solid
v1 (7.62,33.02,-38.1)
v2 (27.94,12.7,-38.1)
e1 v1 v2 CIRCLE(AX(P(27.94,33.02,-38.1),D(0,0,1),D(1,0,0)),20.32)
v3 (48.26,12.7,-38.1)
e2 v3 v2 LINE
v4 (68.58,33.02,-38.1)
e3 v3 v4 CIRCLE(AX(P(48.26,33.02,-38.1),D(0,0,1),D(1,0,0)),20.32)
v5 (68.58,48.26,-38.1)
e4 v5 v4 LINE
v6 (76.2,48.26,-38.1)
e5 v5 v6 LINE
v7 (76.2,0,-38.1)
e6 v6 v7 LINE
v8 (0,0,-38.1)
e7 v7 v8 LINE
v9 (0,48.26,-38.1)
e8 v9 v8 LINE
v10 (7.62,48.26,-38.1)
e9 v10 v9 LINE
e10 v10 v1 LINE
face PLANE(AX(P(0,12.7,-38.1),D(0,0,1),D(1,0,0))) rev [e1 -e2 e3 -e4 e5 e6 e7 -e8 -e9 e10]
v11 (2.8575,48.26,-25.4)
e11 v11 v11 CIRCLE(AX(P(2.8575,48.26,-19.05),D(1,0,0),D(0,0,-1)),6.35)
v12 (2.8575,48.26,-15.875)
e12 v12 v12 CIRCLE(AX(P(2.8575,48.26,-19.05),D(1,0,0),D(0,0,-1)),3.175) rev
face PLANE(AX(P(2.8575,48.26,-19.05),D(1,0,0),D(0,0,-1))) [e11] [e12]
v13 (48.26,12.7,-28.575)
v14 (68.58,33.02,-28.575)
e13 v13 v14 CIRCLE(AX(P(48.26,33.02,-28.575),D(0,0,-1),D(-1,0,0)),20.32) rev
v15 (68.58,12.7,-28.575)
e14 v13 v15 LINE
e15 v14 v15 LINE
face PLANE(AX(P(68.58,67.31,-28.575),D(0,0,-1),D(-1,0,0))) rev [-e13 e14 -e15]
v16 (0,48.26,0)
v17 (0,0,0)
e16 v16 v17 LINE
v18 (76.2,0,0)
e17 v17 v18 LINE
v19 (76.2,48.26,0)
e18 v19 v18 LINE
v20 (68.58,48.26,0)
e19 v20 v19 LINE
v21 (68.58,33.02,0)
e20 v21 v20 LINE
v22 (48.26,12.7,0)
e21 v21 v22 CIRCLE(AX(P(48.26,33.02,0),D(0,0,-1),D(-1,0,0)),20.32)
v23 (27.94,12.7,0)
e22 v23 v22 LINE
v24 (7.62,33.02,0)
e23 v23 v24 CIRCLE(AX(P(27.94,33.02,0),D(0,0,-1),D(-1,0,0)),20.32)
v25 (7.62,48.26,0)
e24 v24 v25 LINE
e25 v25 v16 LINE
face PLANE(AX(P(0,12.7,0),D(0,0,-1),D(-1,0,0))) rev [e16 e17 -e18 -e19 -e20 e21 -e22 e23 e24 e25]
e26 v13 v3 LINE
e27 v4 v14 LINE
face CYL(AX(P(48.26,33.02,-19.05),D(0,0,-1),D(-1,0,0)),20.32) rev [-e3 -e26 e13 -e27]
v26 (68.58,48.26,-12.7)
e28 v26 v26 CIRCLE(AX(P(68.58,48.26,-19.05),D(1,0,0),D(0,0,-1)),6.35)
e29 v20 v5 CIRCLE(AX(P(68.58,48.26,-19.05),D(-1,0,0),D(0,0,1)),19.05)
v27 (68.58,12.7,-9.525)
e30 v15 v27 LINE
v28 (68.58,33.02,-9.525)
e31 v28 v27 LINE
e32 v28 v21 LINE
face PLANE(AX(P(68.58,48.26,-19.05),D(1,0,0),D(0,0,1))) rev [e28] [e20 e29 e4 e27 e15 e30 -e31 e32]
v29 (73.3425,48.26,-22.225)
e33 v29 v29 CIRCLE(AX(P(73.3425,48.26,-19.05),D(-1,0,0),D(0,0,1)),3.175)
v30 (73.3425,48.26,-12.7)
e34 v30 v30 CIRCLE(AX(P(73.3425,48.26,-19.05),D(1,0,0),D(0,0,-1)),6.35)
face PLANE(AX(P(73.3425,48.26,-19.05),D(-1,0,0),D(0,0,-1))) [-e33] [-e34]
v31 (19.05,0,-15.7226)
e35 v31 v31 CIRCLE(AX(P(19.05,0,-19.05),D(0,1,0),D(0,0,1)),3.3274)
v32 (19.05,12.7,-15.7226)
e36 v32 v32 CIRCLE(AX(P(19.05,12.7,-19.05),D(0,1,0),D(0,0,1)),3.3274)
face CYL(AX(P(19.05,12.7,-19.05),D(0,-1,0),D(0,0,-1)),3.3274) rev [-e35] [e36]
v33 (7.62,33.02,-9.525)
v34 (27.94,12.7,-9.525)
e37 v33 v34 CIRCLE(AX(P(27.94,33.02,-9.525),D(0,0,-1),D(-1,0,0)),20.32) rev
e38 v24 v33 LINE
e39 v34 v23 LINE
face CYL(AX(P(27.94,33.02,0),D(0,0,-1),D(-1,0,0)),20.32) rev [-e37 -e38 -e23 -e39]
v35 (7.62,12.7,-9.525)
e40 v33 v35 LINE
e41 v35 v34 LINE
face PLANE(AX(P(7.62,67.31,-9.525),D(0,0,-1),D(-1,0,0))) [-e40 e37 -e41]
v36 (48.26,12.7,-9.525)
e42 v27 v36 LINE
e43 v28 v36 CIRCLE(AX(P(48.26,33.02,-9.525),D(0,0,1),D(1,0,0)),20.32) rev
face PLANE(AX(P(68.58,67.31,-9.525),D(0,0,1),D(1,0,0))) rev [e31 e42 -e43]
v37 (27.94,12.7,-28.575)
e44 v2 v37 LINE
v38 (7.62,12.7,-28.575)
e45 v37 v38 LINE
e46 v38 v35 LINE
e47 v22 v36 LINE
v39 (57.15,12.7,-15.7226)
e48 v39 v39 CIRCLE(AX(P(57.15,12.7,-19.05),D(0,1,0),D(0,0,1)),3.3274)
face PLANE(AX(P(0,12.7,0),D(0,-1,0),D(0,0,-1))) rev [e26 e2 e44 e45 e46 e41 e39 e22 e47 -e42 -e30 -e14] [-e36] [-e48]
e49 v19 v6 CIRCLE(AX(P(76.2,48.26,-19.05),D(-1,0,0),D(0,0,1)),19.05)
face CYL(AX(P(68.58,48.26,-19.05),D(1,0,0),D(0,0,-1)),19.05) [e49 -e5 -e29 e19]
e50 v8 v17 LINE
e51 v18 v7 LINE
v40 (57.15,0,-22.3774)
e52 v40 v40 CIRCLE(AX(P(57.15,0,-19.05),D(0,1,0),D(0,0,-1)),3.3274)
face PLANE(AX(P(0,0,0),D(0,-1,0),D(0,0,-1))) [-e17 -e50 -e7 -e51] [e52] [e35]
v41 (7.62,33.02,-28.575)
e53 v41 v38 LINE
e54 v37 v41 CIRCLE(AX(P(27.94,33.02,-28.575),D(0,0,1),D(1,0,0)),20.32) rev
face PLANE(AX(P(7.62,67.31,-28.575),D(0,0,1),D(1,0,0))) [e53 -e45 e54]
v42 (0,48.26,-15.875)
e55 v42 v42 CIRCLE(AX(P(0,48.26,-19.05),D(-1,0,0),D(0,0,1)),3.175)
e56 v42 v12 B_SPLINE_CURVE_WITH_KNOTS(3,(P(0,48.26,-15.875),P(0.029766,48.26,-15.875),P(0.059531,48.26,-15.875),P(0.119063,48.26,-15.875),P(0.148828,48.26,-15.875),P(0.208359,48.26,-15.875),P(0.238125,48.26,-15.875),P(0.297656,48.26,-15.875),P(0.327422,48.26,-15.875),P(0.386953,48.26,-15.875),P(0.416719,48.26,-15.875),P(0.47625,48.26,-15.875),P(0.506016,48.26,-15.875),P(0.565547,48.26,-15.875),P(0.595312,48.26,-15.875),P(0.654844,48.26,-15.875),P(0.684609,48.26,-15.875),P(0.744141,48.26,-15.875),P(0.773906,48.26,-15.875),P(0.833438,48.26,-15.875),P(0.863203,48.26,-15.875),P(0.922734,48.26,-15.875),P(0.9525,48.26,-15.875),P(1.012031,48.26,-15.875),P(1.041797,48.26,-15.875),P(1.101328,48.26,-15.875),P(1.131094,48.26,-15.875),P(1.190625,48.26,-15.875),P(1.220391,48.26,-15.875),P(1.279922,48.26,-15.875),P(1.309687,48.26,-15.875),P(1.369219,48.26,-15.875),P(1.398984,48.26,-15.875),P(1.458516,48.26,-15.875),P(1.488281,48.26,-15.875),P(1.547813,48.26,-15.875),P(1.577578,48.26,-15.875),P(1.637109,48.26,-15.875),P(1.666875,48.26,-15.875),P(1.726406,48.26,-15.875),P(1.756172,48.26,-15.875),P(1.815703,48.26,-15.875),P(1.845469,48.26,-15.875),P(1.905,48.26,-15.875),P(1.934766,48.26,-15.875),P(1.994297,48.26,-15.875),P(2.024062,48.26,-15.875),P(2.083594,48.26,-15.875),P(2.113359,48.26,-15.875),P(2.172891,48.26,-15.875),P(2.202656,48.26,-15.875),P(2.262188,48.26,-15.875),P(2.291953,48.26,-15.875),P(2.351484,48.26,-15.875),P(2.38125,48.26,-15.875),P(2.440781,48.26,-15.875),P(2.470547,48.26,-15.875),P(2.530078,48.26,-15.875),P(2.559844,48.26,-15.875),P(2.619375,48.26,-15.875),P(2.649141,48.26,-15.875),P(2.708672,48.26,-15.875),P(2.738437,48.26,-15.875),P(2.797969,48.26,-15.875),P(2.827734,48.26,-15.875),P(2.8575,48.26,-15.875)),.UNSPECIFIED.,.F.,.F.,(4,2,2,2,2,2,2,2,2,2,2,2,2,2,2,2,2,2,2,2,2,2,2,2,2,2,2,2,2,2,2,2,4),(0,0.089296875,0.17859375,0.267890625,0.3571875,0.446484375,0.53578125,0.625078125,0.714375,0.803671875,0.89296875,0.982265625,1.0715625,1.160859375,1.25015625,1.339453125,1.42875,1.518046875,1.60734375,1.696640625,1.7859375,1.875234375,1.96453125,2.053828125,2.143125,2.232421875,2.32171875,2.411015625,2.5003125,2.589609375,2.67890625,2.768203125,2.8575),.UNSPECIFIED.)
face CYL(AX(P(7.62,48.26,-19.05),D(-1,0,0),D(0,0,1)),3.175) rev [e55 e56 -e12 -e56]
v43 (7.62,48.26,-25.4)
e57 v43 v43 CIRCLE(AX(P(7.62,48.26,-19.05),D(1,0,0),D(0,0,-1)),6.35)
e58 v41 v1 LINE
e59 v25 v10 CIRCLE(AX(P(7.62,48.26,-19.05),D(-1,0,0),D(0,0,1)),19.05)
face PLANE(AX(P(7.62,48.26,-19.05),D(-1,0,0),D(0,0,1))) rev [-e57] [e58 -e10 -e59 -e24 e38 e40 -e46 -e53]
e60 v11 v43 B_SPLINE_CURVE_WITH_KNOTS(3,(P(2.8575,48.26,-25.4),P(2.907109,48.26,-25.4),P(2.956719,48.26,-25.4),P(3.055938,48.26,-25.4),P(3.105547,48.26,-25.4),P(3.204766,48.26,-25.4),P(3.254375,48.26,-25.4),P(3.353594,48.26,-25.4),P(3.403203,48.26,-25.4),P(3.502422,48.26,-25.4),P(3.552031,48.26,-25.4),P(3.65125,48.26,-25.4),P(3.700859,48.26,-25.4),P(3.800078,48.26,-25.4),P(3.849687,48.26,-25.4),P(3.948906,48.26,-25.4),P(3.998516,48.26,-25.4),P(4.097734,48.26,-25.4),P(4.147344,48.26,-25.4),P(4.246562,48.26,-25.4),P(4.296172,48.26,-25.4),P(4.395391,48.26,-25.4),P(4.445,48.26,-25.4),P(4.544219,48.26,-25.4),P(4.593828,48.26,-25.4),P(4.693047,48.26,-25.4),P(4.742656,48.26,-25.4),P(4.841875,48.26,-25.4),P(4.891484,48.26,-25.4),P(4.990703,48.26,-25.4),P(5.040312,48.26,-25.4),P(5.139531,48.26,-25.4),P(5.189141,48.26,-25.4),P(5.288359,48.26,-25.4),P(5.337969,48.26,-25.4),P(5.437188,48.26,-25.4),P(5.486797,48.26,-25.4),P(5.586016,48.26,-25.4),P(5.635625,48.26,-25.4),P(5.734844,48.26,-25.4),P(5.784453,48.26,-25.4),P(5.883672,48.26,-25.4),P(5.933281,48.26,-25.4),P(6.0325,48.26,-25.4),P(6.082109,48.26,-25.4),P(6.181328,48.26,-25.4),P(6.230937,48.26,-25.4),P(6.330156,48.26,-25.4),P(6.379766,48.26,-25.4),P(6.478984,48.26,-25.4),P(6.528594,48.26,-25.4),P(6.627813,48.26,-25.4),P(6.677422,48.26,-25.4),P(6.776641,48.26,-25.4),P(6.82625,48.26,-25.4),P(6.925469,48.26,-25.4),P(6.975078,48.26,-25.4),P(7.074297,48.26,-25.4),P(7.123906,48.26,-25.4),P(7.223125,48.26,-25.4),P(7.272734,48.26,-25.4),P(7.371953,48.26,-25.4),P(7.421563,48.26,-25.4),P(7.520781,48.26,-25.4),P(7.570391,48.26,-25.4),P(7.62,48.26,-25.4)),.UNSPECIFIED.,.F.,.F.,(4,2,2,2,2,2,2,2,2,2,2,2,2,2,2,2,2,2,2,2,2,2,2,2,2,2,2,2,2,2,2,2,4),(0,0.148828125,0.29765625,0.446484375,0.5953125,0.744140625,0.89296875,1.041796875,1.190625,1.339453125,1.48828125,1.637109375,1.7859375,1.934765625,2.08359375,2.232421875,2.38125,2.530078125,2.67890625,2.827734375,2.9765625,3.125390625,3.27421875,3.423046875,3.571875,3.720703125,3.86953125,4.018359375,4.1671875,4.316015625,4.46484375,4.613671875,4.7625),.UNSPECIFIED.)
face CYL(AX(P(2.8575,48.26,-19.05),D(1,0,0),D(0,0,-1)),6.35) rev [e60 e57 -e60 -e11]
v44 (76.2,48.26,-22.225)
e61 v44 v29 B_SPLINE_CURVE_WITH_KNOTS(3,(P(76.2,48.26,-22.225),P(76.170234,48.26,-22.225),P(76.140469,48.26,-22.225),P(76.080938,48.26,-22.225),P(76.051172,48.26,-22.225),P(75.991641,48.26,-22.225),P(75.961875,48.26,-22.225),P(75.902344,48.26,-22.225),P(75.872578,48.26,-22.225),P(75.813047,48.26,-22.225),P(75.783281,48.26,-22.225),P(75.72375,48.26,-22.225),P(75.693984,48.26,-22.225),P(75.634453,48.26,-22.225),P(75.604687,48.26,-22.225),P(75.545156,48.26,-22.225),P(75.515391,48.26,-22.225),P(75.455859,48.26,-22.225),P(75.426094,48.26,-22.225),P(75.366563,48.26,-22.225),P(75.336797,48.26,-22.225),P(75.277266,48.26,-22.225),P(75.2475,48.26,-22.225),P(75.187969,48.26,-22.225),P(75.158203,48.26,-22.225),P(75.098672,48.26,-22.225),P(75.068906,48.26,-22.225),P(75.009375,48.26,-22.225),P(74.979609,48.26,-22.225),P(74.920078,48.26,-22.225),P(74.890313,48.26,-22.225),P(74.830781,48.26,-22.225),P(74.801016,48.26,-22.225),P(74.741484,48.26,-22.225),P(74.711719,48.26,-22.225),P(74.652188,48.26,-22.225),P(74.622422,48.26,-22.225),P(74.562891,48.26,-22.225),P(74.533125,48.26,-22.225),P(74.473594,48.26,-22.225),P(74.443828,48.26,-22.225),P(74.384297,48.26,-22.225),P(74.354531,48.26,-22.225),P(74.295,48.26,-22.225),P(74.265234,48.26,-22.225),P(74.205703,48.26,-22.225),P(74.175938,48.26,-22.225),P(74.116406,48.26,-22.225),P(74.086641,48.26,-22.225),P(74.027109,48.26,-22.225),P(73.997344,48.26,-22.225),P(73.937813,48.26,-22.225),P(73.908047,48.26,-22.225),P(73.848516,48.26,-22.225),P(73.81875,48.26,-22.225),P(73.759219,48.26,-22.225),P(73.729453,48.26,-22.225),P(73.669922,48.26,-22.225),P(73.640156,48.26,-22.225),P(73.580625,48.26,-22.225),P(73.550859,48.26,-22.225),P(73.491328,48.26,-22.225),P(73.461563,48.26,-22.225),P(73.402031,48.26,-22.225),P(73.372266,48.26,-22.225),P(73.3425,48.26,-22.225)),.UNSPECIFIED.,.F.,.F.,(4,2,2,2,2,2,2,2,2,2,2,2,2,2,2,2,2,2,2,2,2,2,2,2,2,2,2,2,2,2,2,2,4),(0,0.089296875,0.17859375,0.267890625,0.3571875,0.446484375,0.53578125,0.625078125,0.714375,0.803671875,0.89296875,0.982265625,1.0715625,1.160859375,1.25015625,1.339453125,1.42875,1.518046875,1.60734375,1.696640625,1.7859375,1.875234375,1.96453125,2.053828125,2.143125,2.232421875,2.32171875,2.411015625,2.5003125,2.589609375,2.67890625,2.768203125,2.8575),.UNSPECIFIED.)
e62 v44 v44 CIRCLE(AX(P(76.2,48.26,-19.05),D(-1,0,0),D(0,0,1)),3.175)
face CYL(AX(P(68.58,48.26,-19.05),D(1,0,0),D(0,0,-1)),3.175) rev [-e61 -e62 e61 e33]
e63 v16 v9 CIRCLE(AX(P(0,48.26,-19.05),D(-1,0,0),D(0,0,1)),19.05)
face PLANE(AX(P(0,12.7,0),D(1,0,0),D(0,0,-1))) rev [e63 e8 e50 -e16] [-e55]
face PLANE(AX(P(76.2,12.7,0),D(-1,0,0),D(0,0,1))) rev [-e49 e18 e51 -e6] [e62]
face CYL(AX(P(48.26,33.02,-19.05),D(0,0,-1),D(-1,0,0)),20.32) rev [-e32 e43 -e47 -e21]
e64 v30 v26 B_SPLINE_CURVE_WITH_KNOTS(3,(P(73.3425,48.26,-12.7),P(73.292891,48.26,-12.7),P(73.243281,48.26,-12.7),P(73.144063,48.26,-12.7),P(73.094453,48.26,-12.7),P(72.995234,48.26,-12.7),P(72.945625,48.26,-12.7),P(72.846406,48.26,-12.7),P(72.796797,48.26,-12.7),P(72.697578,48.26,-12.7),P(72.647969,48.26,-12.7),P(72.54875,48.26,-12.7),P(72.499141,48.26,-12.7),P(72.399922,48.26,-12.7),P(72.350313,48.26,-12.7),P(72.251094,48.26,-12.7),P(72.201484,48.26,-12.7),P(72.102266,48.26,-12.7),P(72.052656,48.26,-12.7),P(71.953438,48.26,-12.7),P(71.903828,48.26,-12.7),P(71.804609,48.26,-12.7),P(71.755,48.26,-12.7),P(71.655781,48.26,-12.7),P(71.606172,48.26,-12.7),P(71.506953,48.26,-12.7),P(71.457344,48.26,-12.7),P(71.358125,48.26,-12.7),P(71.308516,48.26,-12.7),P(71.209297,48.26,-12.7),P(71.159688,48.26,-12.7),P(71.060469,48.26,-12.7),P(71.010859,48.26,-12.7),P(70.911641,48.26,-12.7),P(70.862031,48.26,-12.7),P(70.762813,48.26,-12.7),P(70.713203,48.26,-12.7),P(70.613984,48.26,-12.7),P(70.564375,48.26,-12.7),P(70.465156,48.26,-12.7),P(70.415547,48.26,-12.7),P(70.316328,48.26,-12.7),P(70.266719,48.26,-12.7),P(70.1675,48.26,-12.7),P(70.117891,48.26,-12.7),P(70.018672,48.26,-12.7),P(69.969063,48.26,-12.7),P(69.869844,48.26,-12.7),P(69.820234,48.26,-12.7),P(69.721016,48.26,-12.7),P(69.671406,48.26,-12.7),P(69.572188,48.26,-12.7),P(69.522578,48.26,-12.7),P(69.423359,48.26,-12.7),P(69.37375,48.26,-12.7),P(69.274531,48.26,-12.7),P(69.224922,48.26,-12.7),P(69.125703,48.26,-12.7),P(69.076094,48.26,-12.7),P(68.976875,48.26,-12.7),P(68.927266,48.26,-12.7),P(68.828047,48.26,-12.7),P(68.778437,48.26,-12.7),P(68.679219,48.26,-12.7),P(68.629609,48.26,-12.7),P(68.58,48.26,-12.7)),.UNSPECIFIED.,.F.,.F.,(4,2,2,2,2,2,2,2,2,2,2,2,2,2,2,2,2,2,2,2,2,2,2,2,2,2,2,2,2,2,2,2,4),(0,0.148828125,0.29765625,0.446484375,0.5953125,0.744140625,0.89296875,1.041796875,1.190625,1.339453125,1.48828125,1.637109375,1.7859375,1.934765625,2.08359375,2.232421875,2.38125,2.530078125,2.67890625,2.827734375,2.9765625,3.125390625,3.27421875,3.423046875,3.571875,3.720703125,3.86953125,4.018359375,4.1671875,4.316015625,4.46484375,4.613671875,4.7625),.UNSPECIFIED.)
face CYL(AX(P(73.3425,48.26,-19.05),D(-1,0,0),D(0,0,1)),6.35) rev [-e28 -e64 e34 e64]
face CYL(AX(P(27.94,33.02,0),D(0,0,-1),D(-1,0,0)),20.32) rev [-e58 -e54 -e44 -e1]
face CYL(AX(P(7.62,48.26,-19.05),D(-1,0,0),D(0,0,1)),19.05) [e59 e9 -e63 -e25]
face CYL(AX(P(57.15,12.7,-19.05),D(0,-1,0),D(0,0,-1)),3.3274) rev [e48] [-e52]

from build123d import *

# Parameters (mm, degrees)
SKETCH1_W           = 76.2
SKETCH1_H           = 38.1
SKETCH1_R           = 3.3274
BOSS_EXTRUDE1_DEPTH = 12.7
SKETCH5_R           = 3.175
BOSS_EXTRUDE3_DEPTH = 7.62
FILLET3_START       = -15.722599236
FILLET3_DEPTH       = 15.722599236
FILLET3_START_2     = -38.1
FILLET3_2_DEPTH     = 15.722595954
FILLET3_START_3     = -22.377404046
FILLET3_3_DEPTH     = 6.65480481
FILLET3_START_4     = 12.7
FILLET3_4_OUTLINE_R = 3.3274
FILLET3_4_DEPTH     = 20.32
SKETCH11_W          = 25.4
SKETCH11_H          = 19.05
CUT_EXTRUDE2_DEPTH  = 102.194377846
SKETCH13_R          = 6.35
CUT_EXTRUDE3_DEPTH  = 4.7625


with BuildPart() as part:
    # Sketch1 → Boss-Extrude1 (new body)
    with BuildSketch(Plane(origin=(0, 0, 0), x_dir=(1, 0, 0), z_dir=(0, 1, 0))):
        with Locations((38.1, 19.05)):
            Rectangle(SKETCH1_W, SKETCH1_H)
        with Locations(Location((19.05, 19.05, 0), (0, 0, 270))):
            Circle(SKETCH1_R, mode=Mode.SUBTRACT)
        with Locations(Location((57.15, 19.05, 0), (0, 0, 90))):
            Circle(SKETCH1_R, mode=Mode.SUBTRACT)
    extrude(amount=BOSS_EXTRUDE1_DEPTH)

    # Sketch5 → Boss-Extrude3 (add)
    with BuildSketch(Plane.ZY):
        with BuildLine():
            Line((-38.1, 12.7), (0, 12.7))
            Line((0, 12.7), (0, 48.26))
            ThreePointArc((0, 48.26), (-19.05, 67.31), (-38.1, 48.26))
            Line((-38.1, 48.26), (-38.1, 12.7))
        make_face()
        with Locations((-19.05, 48.26)):
            Circle(SKETCH5_R, mode=Mode.SUBTRACT)
    boss_extrude3 = extrude(amount=-BOSS_EXTRUDE3_DEPTH)

    # Fillet3: read off the stored shape, not the designer's step
    # Fillet3 outline → Fillet3 (add)
    with BuildSketch(Plane.XY.offset(FILLET3_START)):
        with BuildLine():
            Line((7.62, 12.7), (27.94, 12.7))
            ThreePointArc((27.94, 12.7), (13.571590206, 18.651590206), (7.62, 33.02))
            Line((7.62, 33.02), (7.62, 12.7))
        make_face()
    fillet3 = extrude(amount=FILLET3_DEPTH)

    # Fillet3 2 outline → Fillet3 2 (add)
    with BuildSketch(Plane.XY.offset(FILLET3_START_2)):
        with BuildLine():
            Line((7.62, 12.7), (27.94, 12.7))
            ThreePointArc((27.94, 12.7), (13.571590206, 18.651590206), (7.62, 33.02))
            Line((7.62, 33.02), (7.62, 12.7))
        make_face()
    fillet3_2 = extrude(amount=FILLET3_2_DEPTH)

    # Fillet3 3 outline → Fillet3 3 (add)
    with BuildSketch(Plane.XY.offset(FILLET3_START_3)):
        with BuildLine():
            Line((7.62, 12.7), (27.94, 12.7))
            ThreePointArc((27.94, 12.7), (13.571590206, 18.651590206), (7.62, 33.02))
            Line((7.62, 33.02), (7.62, 12.7))
        make_face()
    fillet3_3 = extrude(amount=FILLET3_3_DEPTH)

    # Fillet3 4 outline → Fillet3 4 (cut)
    with BuildSketch(Plane(origin=(0, 0, 0), x_dir=(1, 0, 0), z_dir=(0, 1, 0)).offset(FILLET3_START_4)):
        with Locations((19.05, 19.05)):
            Circle(FILLET3_4_OUTLINE_R)
    fillet3_4 = extrude(amount=FILLET3_4_DEPTH, mode=Mode.SUBTRACT)

    # Sketch11 → Cut-Extrude2 (cut, through all)
    with BuildSketch(Plane(origin=(0, 12.7, 0), x_dir=(1, 0, 0), z_dir=(0, 1, 0))):
        with Locations((20.32, 19.05)):
            Rectangle(SKETCH11_W, SKETCH11_H)
    cut_extrude2 = extrude(amount=CUT_EXTRUDE2_DEPTH, mode=Mode.SUBTRACT)

    # Sketch13 → Cut-Extrude3 (cut)
    with BuildSketch(Plane(origin=(7.62, 0, 0), x_dir=(0, 0, -1), z_dir=(1, 0, 0))):
        with Locations((19.05, 48.26)):
            Circle(SKETCH13_R)
    cut_extrude3 = extrude(amount=-CUT_EXTRUDE3_DEPTH, mode=Mode.SUBTRACT)

    # Mirror3: Boss-Extrude3, Fillet3, Fillet3 2, Fillet3 3, Fillet3 4 across plane
    add(boss_extrude3.mirror(Plane(origin=(38.1, 0, 0), x_dir=(0, 0, 1), z_dir=(1, 0, 0))))
    add(fillet3.mirror(Plane(origin=(38.1, 0, 0), x_dir=(0, 0, 1), z_dir=(1, 0, 0))))
    add(fillet3_2.mirror(Plane(origin=(38.1, 0, 0), x_dir=(0, 0, 1), z_dir=(1, 0, 0))))
    add(fillet3_3.mirror(Plane(origin=(38.1, 0, 0), x_dir=(0, 0, 1), z_dir=(1, 0, 0))))
    add(fillet3_4.mirror(Plane(origin=(38.1, 0, 0), x_dir=(0, 0, 1), z_dir=(1, 0, 0))), mode=Mode.SUBTRACT)

    # Mirror4: Cut-Extrude2 across plane
    add(cut_extrude2.mirror(Plane(origin=(38.1, 0, 0), x_dir=(0, 0, 1), z_dir=(1, 0, 0))), mode=Mode.SUBTRACT)

    # Mirror5: Cut-Extrude3 across plane
    add(cut_extrude3.mirror(Plane(origin=(38.1, 0, 0), x_dir=(0, 0, 1), z_dir=(1, 0, 0))), mode=Mode.SUBTRACT)


solid = part.part
